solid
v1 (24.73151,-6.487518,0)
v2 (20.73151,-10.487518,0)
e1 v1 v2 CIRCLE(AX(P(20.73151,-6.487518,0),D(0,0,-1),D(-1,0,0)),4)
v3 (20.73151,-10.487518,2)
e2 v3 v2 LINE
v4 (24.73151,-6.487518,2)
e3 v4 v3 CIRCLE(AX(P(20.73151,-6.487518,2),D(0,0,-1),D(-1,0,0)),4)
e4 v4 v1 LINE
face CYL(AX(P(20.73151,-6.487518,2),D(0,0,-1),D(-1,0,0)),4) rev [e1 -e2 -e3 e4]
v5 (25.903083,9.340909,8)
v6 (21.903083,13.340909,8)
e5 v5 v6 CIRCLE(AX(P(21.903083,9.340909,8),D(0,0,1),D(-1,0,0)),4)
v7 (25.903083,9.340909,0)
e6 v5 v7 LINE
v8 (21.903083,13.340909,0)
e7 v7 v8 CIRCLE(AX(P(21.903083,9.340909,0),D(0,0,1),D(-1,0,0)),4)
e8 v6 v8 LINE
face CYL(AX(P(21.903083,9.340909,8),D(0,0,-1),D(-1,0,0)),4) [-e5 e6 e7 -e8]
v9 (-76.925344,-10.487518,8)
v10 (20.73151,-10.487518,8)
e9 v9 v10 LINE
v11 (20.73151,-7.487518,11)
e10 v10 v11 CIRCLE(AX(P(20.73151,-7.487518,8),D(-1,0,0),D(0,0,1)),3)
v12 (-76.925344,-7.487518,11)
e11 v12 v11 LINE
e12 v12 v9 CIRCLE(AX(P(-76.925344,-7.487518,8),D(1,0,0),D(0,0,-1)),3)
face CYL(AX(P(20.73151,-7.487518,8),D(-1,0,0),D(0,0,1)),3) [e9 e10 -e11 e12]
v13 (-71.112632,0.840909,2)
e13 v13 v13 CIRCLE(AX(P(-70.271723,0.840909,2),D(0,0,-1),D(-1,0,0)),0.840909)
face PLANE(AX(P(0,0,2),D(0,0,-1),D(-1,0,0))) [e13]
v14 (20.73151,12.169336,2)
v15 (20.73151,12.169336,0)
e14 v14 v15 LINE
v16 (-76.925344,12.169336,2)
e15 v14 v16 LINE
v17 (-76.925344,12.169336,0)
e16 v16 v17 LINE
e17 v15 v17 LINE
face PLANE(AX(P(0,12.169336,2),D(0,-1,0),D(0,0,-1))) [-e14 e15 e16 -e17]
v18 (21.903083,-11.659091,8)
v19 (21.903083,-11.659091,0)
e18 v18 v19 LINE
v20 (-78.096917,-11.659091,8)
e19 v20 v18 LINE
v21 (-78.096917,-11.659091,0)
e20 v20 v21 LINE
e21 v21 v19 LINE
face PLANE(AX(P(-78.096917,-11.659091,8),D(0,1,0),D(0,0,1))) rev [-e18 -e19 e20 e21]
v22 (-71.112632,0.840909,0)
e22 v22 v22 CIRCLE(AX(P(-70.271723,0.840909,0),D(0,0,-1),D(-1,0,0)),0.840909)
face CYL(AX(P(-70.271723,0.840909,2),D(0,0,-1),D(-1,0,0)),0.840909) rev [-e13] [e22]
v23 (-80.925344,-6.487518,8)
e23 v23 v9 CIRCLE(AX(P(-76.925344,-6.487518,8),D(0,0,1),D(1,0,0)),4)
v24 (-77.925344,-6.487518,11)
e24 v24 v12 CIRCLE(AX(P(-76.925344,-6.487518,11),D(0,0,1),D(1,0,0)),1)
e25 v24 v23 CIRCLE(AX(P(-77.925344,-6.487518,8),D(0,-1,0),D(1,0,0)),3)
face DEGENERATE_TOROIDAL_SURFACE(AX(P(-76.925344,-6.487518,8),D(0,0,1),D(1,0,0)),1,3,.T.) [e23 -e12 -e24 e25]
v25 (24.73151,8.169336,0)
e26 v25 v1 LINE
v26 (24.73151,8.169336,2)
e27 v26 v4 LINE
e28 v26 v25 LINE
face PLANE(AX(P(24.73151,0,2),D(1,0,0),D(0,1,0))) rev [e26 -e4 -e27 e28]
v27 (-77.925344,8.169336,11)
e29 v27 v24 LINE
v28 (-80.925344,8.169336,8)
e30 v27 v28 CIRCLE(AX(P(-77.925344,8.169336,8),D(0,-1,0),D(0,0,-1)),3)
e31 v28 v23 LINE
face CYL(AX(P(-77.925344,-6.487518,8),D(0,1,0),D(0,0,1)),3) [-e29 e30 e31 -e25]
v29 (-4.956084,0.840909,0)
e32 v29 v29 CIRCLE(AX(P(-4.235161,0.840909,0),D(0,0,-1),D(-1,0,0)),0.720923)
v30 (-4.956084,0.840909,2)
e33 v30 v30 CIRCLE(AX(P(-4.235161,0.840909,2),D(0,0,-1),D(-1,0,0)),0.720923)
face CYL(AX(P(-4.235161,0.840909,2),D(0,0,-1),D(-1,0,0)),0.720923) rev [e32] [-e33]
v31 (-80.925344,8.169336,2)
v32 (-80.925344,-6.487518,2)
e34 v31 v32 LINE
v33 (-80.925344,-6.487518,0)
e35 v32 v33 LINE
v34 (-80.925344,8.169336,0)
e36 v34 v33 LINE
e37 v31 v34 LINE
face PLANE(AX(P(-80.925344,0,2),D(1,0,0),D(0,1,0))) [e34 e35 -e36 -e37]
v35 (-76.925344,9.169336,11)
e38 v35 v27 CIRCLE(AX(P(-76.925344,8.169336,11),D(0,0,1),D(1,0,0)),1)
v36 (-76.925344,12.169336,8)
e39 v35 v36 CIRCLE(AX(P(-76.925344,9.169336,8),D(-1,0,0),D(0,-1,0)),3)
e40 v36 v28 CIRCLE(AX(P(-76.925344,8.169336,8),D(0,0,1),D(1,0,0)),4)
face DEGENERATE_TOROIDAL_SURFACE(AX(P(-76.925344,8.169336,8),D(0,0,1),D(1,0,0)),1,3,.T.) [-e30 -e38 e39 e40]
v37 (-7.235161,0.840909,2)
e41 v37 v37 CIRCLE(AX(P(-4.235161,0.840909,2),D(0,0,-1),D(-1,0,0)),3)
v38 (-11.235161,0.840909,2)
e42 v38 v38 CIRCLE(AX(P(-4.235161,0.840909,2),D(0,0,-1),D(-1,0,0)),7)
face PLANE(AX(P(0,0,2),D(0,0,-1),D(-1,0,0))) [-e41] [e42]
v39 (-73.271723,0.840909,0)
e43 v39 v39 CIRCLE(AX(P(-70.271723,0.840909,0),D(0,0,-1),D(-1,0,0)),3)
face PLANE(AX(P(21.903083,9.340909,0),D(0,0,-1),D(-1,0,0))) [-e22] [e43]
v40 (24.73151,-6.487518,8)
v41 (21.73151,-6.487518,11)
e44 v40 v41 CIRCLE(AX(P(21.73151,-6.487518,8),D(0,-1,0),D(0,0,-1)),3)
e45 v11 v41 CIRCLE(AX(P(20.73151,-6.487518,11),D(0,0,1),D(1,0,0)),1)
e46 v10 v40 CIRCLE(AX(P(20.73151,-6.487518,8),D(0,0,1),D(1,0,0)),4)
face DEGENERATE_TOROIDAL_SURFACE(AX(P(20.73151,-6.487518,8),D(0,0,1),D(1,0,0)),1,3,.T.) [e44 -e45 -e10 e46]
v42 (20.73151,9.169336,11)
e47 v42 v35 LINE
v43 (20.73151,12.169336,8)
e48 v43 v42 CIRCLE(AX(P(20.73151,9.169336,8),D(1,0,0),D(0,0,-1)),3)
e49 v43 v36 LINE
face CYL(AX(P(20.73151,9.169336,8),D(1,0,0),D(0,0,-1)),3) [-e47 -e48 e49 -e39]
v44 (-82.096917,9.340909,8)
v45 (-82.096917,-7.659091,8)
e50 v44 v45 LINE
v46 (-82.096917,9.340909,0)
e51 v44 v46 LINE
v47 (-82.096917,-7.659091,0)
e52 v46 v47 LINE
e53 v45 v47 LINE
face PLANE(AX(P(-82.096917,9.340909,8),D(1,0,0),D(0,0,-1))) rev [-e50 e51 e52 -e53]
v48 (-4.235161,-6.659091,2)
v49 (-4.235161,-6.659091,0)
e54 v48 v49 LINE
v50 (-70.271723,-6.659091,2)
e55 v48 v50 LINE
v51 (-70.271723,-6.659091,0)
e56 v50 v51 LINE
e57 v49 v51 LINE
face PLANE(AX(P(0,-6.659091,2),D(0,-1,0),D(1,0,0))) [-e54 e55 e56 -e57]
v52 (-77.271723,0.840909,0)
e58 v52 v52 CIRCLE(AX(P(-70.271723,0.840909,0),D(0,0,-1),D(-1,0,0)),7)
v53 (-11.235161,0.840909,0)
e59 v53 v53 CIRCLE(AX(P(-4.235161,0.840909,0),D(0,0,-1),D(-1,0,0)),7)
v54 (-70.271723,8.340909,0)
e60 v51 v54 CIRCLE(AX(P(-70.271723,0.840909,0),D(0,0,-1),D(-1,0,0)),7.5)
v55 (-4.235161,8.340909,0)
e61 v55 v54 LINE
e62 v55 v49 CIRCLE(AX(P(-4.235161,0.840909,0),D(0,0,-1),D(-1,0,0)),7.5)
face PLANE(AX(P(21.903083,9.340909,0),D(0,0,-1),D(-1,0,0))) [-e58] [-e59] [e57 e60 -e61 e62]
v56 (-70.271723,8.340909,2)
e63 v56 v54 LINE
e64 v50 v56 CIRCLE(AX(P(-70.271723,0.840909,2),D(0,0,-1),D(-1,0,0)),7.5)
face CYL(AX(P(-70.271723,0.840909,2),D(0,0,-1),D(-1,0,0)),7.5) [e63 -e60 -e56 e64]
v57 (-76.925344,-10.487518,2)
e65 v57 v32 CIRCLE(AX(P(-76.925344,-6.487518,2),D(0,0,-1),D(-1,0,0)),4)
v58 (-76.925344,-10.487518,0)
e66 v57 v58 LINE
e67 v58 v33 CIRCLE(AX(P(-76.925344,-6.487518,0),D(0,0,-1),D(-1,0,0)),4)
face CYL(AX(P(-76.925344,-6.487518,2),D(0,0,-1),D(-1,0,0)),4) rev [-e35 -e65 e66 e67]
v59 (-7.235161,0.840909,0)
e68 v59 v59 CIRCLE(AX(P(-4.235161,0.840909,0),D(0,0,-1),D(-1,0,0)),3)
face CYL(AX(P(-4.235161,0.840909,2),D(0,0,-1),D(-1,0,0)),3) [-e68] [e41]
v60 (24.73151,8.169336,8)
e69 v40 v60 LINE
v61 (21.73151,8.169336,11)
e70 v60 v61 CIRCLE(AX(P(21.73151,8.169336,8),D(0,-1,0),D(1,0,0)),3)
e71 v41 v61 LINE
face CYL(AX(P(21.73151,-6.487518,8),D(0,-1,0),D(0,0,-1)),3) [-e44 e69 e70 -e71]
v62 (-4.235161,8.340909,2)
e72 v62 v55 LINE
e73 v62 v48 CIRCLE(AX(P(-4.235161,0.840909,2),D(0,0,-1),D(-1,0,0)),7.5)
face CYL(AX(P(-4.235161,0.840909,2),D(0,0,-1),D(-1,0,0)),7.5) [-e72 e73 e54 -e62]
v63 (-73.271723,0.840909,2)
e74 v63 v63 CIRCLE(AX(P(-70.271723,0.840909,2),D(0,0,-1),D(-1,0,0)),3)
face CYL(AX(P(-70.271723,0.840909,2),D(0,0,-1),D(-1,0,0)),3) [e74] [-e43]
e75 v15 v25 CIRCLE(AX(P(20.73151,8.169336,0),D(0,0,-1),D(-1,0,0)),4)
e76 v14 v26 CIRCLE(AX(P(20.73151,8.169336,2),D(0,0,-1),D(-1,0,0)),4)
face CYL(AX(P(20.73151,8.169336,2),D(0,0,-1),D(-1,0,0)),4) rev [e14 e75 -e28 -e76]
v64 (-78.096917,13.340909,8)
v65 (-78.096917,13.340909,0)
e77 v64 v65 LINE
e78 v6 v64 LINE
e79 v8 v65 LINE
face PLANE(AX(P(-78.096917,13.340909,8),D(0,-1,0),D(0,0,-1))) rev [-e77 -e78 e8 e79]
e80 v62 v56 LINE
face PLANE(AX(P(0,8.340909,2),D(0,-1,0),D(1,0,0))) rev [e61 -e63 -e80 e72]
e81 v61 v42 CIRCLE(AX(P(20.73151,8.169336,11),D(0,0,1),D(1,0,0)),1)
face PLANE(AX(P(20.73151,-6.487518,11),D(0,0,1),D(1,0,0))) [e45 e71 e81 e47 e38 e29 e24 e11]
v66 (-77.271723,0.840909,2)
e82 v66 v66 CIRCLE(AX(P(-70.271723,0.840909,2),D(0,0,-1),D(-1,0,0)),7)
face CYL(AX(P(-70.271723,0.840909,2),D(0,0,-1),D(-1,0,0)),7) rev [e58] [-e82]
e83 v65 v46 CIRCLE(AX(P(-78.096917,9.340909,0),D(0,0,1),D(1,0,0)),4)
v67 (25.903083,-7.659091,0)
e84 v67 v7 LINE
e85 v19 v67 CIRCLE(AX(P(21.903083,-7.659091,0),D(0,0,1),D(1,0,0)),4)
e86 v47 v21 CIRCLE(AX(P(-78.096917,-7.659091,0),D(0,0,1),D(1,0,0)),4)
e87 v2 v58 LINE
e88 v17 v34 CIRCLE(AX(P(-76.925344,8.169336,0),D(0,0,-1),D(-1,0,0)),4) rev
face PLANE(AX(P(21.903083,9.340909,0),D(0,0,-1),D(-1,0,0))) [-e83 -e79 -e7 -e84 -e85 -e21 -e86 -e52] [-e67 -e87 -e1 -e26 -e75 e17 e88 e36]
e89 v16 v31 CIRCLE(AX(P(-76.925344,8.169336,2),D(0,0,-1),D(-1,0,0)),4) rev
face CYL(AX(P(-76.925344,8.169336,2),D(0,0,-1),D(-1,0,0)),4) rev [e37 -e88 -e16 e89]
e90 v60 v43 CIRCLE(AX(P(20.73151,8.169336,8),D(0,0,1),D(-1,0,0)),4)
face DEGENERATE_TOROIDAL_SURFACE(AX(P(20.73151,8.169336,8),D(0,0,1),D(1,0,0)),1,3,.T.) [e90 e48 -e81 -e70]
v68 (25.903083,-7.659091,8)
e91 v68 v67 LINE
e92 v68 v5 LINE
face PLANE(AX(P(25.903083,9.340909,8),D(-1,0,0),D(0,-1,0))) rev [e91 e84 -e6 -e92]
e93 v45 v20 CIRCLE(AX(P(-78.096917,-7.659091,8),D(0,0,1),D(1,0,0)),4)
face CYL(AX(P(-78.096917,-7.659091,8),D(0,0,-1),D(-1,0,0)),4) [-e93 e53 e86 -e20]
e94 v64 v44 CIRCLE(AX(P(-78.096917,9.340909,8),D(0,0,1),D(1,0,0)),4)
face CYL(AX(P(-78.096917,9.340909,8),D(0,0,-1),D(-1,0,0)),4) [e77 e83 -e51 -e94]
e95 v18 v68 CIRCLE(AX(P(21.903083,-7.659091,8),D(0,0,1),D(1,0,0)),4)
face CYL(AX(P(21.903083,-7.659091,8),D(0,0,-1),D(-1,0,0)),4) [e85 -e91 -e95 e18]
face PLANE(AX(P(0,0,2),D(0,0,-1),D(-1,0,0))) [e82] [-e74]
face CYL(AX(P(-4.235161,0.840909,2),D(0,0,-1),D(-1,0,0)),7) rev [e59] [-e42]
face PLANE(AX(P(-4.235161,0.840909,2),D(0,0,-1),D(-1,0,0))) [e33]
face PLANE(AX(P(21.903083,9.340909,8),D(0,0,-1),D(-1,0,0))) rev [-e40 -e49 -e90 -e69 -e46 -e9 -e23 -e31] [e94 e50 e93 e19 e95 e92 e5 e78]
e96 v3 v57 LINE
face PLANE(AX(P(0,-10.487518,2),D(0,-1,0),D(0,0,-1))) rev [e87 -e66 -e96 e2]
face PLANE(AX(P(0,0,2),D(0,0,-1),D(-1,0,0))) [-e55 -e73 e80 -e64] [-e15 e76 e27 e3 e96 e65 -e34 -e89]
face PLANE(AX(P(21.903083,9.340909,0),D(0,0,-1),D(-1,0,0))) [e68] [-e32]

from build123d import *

# Parameters (mm, degrees)
EXTRUDE_1_DEPTH     = 8
SKETCH_2_R          = 7
SKETCH_2_R_2        = 3
SKETCH_2_R_3        = 0.840909091
SKETCH_2_R_4        = 0.720923158
CUT_EXTRUDE_1_DEPTH = 2
EXTRUDE_2_DEPTH     = 3
FILLET_1_R          = 3


with BuildPart() as part:
    # 스케치1 → 보스-돌출1 (new body)
    with BuildSketch(Plane.XY):
        with BuildLine():
            Line((-78.096917245, 13.340909091), (21.903082755, 13.340909091))
            ThreePointArc((21.903082755, 13.340909091), (24.73150988, 12.169336216), (25.903082755, 9.340909091))
            Line((25.903082755, 9.340909091), (25.903082755, -7.659090909))
            ThreePointArc((25.903082755, -7.659090909), (24.73150988, -10.487518034), (21.903082755, -11.659090909))
            Line((21.903082755, -11.659090909), (-78.096917245, -11.659090909))
            ThreePointArc((-78.096917245, -11.659090909), (-80.92534437, -10.487518034), (-82.096917245, -7.659090909))
            Line((-82.096917245, -7.659090909), (-82.096917245, 9.340909091))
            ThreePointArc((-82.096917245, 9.340909091), (-80.92534437, 12.169336216), (-78.096917245, 13.340909091))
        make_face()
    extrude(amount=EXTRUDE_1_DEPTH)

    # 스케치2 → 컷-돌출1 (cut)
    # profile 1 of 5: a face of its own
    with BuildSketch(Plane(origin=(0, 0, 0), x_dir=(-1, 0, 0), z_dir=(0, 0, -1))):
        with BuildLine():
            Line((-20.73150988, 12.169336216), (76.92534437, 12.169336216))
            ThreePointArc((76.92534437, 12.169336216), (79.753771494, 10.99776334), (80.92534437, 8.169336216))
            Line((80.92534437, 8.169336216), (80.92534437, -6.487518034))
            ThreePointArc((80.92534437, -6.487518034), (79.753771494, -9.315945159), (76.92534437, -10.487518034))
            Line((76.92534437, -10.487518034), (-20.73150988, -10.487518034))
            ThreePointArc((-20.73150988, -10.487518034), (-23.559937005, -9.315945159), (-24.73150988, -6.487518034))
            Line((-24.73150988, -6.487518034), (-24.73150988, 8.169336216))
            ThreePointArc((-24.73150988, 8.169336216), (-23.559937005, 10.99776334), (-20.73150988, 12.169336216))
        make_face()
        with BuildLine():
            ThreePointArc((4.235161258, 8.340909091), (-3.264838742, 0.840909091), (4.235161258, -6.659090909))
            Line((4.235161258, -6.659090909), (70.271722555, -6.659090909))
            ThreePointArc((70.271722555, -6.659090909), (77.771722555, 0.840909091), (70.271722555, 8.340909091))
            Line((70.271722555, 8.340909091), (4.235161258, 8.340909091))
        make_face(mode=Mode.SUBTRACT)
    # profile 2 of 5: a face of its own
    with BuildSketch(Plane(origin=(0, 0, 0), x_dir=(-1, 0, 0), z_dir=(0, 0, -1))):
        with Locations((4.235161258, 0.840909091)):
            Circle(SKETCH_2_R)
        with Locations((4.235161258, 0.840909091)):
            Circle(SKETCH_2_R_2, mode=Mode.SUBTRACT)
    # profile 3 of 5: a face of its own
    with BuildSketch(Plane(origin=(0, 0, 0), x_dir=(-1, 0, 0), z_dir=(0, 0, -1))):
        with Locations((70.271722555, 0.840909091)):
            Circle(SKETCH_2_R)
        with Locations((70.271722555, 0.840909091)):
            Circle(SKETCH_2_R_2, mode=Mode.SUBTRACT)
    # profile 4 of 5: a face of its own
    with BuildSketch(Plane(origin=(0, 0, 0), x_dir=(-1, 0, 0), z_dir=(0, 0, -1))):
        with Locations((70.271722555, 0.840909091)):
            Circle(SKETCH_2_R_3)
    # profile 5 of 5: a face of its own
    with BuildSketch(Plane(origin=(0, 0, 0), x_dir=(-1, 0, 0), z_dir=(0, 0, -1))):
        with Locations((4.235161258, 0.840909091)):
            Circle(SKETCH_2_R_4)
    extrude(amount=-CUT_EXTRUDE_1_DEPTH, mode=Mode.SUBTRACT)

    # 스케치3 → 보스-돌출2 (add)
    with BuildSketch(Plane.XY.offset(8)):
        with BuildLine():
            Line((-76.92534437, 12.169336216), (20.73150988, 12.169336216))
            ThreePointArc((20.73150988, 12.169336216), (23.559937005, 10.99776334), (24.73150988, 8.169336216))
            Line((24.73150988, 8.169336216), (24.73150988, -6.487518034))
            ThreePointArc((24.73150988, -6.487518034), (23.559937005, -9.315945159), (20.73150988, -10.487518034))
            Line((20.73150988, -10.487518034), (-76.92534437, -10.487518034))
            ThreePointArc((-76.92534437, -10.487518034), (-79.753771494, -9.315945159), (-80.92534437, -6.487518034))
            Line((-80.92534437, -6.487518034), (-80.92534437, 8.169336216))
            ThreePointArc((-80.92534437, 8.169336216), (-79.753771494, 10.99776334), (-76.92534437, 12.169336216))
        make_face()
    extrude(amount=EXTRUDE_2_DEPTH)

    # 필렛1
    fillet_1_edges = [part.edges().sort_by_distance(p)[0] for p in [
        (-28.096917245, -10.487518034, 11),
        (-79.753771494, -9.315945159, 11),
        (-80.92534437, 0.840909091, 11),
        (-79.753771494, 10.99776334, 11),
        (-28.096917245, 12.169336216, 11),
        (23.559937005, 10.99776334, 11),
        (24.73150988, 0.840909091, 11),
        (23.559937005, -9.315945159, 11),
    ]]
    fillet(fillet_1_edges, radius=FILLET_1_R - 0.0001)  # a hair under: the kernel refuses the full size


solid = part.part
